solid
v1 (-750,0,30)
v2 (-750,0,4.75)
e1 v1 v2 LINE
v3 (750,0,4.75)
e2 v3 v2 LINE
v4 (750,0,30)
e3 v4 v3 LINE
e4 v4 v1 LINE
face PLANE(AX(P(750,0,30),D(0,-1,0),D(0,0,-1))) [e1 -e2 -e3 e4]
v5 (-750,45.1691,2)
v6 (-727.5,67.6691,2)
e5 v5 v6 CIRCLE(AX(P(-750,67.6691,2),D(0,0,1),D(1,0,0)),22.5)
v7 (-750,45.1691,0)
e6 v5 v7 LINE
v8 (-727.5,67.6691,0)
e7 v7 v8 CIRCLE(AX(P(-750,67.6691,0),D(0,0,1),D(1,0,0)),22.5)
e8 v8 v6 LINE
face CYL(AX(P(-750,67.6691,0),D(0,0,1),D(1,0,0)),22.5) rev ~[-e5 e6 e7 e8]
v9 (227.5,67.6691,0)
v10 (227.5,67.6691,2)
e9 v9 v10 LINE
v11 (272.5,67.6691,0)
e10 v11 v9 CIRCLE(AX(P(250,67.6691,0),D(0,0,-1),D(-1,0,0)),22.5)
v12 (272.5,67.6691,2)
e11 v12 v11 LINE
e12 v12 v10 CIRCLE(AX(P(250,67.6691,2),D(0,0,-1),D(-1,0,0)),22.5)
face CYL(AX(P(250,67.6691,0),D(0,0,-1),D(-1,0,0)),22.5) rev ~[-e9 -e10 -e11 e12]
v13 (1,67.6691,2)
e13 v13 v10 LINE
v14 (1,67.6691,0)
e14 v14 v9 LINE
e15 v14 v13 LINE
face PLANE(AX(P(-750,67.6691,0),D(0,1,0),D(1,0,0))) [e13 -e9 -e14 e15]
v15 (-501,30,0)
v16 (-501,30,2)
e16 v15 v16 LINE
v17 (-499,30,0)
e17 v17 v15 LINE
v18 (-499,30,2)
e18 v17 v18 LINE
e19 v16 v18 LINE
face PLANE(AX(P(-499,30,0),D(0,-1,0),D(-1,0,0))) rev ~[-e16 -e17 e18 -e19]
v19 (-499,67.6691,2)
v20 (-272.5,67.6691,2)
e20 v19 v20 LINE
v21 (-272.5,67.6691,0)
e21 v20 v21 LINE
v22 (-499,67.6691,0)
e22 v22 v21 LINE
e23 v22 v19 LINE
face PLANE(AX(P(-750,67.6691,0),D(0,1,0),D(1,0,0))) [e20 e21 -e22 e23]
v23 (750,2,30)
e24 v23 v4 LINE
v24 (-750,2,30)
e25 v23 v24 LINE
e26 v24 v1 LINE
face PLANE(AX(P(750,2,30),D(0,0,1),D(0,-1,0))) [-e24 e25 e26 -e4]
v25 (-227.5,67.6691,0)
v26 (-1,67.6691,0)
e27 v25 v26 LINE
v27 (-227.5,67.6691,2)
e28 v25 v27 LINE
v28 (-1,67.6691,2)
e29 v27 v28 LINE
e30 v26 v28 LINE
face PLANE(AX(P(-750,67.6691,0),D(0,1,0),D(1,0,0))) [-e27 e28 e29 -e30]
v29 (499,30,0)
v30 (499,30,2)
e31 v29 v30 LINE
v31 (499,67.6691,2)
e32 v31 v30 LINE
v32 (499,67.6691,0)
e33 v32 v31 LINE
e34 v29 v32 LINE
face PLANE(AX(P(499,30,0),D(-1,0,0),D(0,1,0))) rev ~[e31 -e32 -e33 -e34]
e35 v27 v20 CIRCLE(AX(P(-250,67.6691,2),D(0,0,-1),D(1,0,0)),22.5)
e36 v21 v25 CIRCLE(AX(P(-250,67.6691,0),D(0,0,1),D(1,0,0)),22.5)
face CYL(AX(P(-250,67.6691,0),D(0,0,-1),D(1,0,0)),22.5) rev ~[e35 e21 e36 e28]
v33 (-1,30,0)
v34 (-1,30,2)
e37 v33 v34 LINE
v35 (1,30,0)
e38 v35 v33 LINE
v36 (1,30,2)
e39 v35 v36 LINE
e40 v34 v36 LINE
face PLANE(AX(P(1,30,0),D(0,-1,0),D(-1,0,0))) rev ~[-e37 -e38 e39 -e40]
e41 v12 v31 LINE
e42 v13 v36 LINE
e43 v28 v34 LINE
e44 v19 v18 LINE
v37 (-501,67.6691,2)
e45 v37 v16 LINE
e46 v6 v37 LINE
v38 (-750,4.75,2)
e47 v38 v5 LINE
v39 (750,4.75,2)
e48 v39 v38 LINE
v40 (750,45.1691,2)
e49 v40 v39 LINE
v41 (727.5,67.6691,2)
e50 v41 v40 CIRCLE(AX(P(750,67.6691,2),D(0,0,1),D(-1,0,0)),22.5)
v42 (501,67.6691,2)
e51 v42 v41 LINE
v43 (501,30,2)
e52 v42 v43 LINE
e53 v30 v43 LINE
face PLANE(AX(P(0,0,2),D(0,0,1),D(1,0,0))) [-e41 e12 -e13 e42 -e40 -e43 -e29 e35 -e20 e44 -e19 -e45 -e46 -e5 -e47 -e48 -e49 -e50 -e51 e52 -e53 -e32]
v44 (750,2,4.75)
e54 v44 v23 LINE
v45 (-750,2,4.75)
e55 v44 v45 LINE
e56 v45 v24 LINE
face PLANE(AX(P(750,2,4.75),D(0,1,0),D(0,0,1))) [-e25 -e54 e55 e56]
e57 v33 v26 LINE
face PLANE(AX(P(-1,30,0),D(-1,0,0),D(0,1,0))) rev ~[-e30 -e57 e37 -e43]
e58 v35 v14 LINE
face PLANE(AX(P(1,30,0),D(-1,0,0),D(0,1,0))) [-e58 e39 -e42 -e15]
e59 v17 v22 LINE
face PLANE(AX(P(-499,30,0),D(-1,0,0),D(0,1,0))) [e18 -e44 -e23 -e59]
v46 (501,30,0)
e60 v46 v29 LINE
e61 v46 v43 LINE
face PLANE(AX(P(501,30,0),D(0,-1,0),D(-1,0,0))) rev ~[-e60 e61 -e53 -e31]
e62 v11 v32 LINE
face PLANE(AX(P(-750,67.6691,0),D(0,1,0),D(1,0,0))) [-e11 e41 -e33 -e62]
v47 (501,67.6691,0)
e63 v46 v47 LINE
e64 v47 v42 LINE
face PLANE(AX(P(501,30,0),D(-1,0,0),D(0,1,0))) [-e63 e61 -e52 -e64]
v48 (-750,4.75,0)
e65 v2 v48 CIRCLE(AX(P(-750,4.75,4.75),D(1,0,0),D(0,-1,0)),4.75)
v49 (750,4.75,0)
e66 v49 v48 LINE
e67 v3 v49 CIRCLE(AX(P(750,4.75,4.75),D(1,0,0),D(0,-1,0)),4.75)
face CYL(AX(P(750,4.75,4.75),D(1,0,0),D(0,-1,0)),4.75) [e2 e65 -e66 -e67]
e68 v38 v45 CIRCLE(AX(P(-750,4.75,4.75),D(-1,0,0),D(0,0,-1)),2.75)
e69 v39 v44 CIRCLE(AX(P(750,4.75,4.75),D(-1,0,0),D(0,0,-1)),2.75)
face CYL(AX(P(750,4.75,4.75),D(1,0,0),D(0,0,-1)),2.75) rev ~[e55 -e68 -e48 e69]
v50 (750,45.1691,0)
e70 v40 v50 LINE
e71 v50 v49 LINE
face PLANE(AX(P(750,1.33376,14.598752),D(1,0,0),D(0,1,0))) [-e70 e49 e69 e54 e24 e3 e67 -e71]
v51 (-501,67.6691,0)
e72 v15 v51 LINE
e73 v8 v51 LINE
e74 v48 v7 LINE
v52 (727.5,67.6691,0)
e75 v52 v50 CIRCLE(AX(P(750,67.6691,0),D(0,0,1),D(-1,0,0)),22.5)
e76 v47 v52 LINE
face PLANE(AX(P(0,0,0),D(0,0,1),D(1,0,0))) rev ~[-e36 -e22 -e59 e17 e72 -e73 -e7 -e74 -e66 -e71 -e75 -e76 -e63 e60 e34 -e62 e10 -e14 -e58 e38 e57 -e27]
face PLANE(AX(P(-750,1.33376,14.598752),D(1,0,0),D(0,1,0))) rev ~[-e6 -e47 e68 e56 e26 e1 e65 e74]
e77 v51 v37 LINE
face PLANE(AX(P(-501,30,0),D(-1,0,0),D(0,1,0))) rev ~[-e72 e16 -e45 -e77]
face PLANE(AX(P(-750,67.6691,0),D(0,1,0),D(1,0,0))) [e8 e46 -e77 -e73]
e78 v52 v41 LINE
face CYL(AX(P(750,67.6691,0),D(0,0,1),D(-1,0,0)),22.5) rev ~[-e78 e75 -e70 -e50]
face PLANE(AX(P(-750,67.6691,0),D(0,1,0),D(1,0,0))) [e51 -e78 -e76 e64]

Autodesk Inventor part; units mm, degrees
ref_plane "YZ Plane" through (0, 0, 0) normal (1, 0, 0) x (0, 1, 0)
ref_plane "XZ Plane" through (0, 0, 0) normal (0, 1, 0) x (-1, 0, 0)
ref_plane "XY Plane" through (0, 0, 0) normal (0, 0, 1) x (1, 0, 0)
sketch "Sketch1" plane through (0, 0, 0) normal (0, 0, 1) x (1, 0, 0)
  line L0 (-750, 67.6691) -> (750, 67.6691)
  line L1 (750, 67.6691) -> (750, 0)
  line L2 (750, 0) -> (-750, 0)
  line L3 (-750, 0) -> (-750, 67.6691)
  point P0 (0, 0)
  point P1 (0, 0)
  dimension "d0" = 1500
  dimension "d1" = 67.669
extrude "Plate1" add sketch "Sketch1" along normal blind 2
sketch "Sketch2" plane through (750, 2, 0) normal (0, -1, 0) x (1, 0, 0)
  line L0 (-1500, 0) -> (0, 0)
  line L1 (0, 0) -> (0, 30)
  line L2 (0, 30) -> (-1500, 30)
  line L3 (-1500, 30) -> (-1500, 0)
edge flange "Flange1" height 30 angle 90 thickness 2 bend radius 2.75 thickness toward (0, -1, 0) relief round relief width 2 relief depth 1 edges at (0, 0, 2) wall of the first edge with corners at (-750, 2, 0) (750, 2, 0) (750, 2, 30) (-750, 2, 30)
bend "Bend1"
corner "Corner1"
sketch "Sketch5" plane through (0, 0, 0) normal (0, 0, -1) x (-1, 0, 0)
  line L0 (750, 67.6691) -> (-750, 67.6691) projected
  line L1 (-1, 30) -> (-1, 67.6691)
  line L2 (750, 0) -> (-750, 0) projected
  line L3 (-1, 30) -> (1, 30)
  line L4 (1, 30) -> (1, 67.6691)
  point P0 (0, 0)
  point P1 (0, 30)
  point P2 (0, 0)
  dimension "d27" = 2
  dimension "d29" = 30
extrude "Extrusion1" cut sketch "Sketch5" against normal through all
pattern_linear "Rectangular Pattern1" count 3 spacing 500 along (1, 0, 0) of "Extrusion1" first direction both ways yes
sketch "Sketch6" plane through (0, 0, 0) normal (0, 0, -1) x (-1, 0, 0)
  line L0 (-750, 67.6691) -> (-750, 4.75) projected
  circle A0 centre (-750, 67.6691) radius 22.5
  line L1 (-750, 67.6691) -> (750, 67.6691) projected
  line L2 (-1, 67.6691) -> (-1, 30) projected
  line L3 (-499, 30) -> (-499, 67.6691) projected
  line L4 (-1, 30) -> (-499, 30) construction
  circle A1 centre (-250, 67.6691) radius 22.5
  point P0 (0, 0)
  point P1 (-727.5, 67.6691)
  point P2 (-750, 45.1691)
  point P3 (-250, 30)
  dimension "d24" = 45
extrude "Extrusion2" cut sketch "Sketch6" along normal mid plane 30 contours L1 A0 L0 | A1 L1 | L1 A1 picked at (-748.3311, 52.8571)
mirror "Mirror1" about plane through (0, 0, 0) normal (1, 0, 0) of "Extrusion2"
sketch "Sketch7" plane through (0, 0, 2) normal (0, 0, 1) x (1, 0, 0)
  arc A0 (-750, 45.1691) -> (-727.5, 67.6691) centre (-750, 67.6691) ccw projected
  line L0 (-750, 4.75) -> (-750, 45.1691) projected
  line L1 (-750, 4.75) -> (750, 4.75) projected
  line L2 (750, 45.1691) -> (750, 4.75) projected
  arc A1 (727.5, 67.6691) -> (750, 45.1691) centre (750, 67.6691) ccw projected
  line L3 (501, 67.6691) -> (727.5, 67.6691) projected
  line L4 (501, 67.6691) -> (501, 30) projected
  line L5 (501, 30) -> (499, 30) projected
  line L6 (499, 30) -> (499, 67.6691) projected
  line L7 (1, 67.6691) -> (227.5, 67.6691) projected
  line L8 (1, 67.6691) -> (1, 30) projected
  line L9 (1, 30) -> (-1, 30) projected
  line L10 (-1, 30) -> (-1, 67.6691) projected
  line L11 (-499, 67.6691) -> (-272.5, 67.6691) projected
  line L12 (-499, 67.6691) -> (-499, 30) projected
  line L13 (-499, 30) -> (-501, 30) projected
  line L14 (-501, 30) -> (-501, 67.6691) projected
  line L15 (-727.5, 67.6691) -> (-501, 67.6691) projected
  line L16 (649, 32.2095) -> (651, 32.2095)
  line L17 (651, 32.2095) -> (651, 40.2095)
  line L18 (651, 40.2095) -> (649, 40.2095)
  line L19 (649, 40.2095) -> (649, 32.2095)
  line L20 (-750, 4.75) -> (750, 4.75) projected
  line L21 (650, 4.75) -> (650, 67.6691) construction
  line L22 (637, 32.2095) -> (639, 32.2095)
  line L23 (639, 32.2095) -> (639, 40.2095)
  line L24 (639, 40.2095) -> (637, 40.2095)
  line L25 (637, 40.2095) -> (637, 32.2095)
  line L26 (272.5, 67.6691) -> (499, 67.6691) projected
  arc A2 (227.5, 67.6691) -> (272.5, 67.6691) centre (250, 67.6691) ccw projected
  line L27 (-227.5, 67.6691) -> (-1, 67.6691) projected
  arc A3 (-272.5, 67.6691) -> (-227.5, 67.6691) centre (-250, 67.6691) ccw projected
  point P0 (0, 0)
  point P1 (650, 32.2095)
  point P2 (649, 36.2095)
  point P3 (650, 36.2095)
  point P4 (639, 36.2095)
  dimension "d30" = 2
  dimension "d31" = 8
  dimension "d32" = 100
  dimension "d33" = 2
  dimension "d34" = 8
  dimension "d35" = 10
extrude "Extrusion3" [suppressed]
mirror "Mirror2" [suppressed]
sketch "Sketch9" plane through (0, 0, 2) normal (0, 0, 1) x (1, 0, 0)
  line L0 (494, 62.6691) -> (494, 50.6691) construction
  line L1 (494, 50.6691) -> (294, 50.6691) construction
  line L2 (294, 50.6691) -> (294, 62.6691) construction
  line L3 (294, 62.6691) -> (494, 62.6691) construction
  line L4 (499, 30) -> (499, 67.6691) projected
  line L5 (1, 67.6691) -> (499, 67.6691) projected
  point P0 (0, 0)
  dimension "d40" = 200
  dimension "d41" = 12
  dimension "d42" = 5
  dimension "d43" = 5
mark "Mark2"
equation "\"d1\" = Стрингер_2"
equation "\"d27\" = d18"
equation "\"d29\" = Стрингер_глубина_паза"
equation "\"d43\" = d42"
equation "\"d2\" = Thickness"
equation "\"d3\" = BendReliefWidth"
equation "\"d4\" = BendReliefDepth"
equation "\"d5\" = MinimumRemnant"
equation "\"d6\" = TransitionRadius"
equation "\"d9\" = BendRadius"
equation "\"d10\" = CornerReliefSize"
equation "\"d11\" = GapSize"
equation "\"d12\" = JacobiRadiusSize"
equation "\"BendReliefWidth\" = Thickness"
equation "\"BendReliefDepth\" = 0.5 * Thickness"
equation "\"CornerReliefSize\" = 4 * Thickness"
equation "\"MinimumRemnant\" = 2 * Thickness"
equation "\"TransitionRadius\" = BendRadius"
equation "\"JacobiRadiusSize\" = BendRadius"
equation "\"GapSize\" = Thickness"
equation "\"d18\" = Thickness"
equation "\"qqqqqq\" = 67.35706"
equation "\"Стрингер_2\" = 67.669053"
equation "\"Стрингер_глубина_паза\" = 30"
equation "\"Thickness\" = 2"
equation "\"BendRadius\" = 2.75"
properties part number "MSC 052 stringer back ^^" material "Stainless Steel"
